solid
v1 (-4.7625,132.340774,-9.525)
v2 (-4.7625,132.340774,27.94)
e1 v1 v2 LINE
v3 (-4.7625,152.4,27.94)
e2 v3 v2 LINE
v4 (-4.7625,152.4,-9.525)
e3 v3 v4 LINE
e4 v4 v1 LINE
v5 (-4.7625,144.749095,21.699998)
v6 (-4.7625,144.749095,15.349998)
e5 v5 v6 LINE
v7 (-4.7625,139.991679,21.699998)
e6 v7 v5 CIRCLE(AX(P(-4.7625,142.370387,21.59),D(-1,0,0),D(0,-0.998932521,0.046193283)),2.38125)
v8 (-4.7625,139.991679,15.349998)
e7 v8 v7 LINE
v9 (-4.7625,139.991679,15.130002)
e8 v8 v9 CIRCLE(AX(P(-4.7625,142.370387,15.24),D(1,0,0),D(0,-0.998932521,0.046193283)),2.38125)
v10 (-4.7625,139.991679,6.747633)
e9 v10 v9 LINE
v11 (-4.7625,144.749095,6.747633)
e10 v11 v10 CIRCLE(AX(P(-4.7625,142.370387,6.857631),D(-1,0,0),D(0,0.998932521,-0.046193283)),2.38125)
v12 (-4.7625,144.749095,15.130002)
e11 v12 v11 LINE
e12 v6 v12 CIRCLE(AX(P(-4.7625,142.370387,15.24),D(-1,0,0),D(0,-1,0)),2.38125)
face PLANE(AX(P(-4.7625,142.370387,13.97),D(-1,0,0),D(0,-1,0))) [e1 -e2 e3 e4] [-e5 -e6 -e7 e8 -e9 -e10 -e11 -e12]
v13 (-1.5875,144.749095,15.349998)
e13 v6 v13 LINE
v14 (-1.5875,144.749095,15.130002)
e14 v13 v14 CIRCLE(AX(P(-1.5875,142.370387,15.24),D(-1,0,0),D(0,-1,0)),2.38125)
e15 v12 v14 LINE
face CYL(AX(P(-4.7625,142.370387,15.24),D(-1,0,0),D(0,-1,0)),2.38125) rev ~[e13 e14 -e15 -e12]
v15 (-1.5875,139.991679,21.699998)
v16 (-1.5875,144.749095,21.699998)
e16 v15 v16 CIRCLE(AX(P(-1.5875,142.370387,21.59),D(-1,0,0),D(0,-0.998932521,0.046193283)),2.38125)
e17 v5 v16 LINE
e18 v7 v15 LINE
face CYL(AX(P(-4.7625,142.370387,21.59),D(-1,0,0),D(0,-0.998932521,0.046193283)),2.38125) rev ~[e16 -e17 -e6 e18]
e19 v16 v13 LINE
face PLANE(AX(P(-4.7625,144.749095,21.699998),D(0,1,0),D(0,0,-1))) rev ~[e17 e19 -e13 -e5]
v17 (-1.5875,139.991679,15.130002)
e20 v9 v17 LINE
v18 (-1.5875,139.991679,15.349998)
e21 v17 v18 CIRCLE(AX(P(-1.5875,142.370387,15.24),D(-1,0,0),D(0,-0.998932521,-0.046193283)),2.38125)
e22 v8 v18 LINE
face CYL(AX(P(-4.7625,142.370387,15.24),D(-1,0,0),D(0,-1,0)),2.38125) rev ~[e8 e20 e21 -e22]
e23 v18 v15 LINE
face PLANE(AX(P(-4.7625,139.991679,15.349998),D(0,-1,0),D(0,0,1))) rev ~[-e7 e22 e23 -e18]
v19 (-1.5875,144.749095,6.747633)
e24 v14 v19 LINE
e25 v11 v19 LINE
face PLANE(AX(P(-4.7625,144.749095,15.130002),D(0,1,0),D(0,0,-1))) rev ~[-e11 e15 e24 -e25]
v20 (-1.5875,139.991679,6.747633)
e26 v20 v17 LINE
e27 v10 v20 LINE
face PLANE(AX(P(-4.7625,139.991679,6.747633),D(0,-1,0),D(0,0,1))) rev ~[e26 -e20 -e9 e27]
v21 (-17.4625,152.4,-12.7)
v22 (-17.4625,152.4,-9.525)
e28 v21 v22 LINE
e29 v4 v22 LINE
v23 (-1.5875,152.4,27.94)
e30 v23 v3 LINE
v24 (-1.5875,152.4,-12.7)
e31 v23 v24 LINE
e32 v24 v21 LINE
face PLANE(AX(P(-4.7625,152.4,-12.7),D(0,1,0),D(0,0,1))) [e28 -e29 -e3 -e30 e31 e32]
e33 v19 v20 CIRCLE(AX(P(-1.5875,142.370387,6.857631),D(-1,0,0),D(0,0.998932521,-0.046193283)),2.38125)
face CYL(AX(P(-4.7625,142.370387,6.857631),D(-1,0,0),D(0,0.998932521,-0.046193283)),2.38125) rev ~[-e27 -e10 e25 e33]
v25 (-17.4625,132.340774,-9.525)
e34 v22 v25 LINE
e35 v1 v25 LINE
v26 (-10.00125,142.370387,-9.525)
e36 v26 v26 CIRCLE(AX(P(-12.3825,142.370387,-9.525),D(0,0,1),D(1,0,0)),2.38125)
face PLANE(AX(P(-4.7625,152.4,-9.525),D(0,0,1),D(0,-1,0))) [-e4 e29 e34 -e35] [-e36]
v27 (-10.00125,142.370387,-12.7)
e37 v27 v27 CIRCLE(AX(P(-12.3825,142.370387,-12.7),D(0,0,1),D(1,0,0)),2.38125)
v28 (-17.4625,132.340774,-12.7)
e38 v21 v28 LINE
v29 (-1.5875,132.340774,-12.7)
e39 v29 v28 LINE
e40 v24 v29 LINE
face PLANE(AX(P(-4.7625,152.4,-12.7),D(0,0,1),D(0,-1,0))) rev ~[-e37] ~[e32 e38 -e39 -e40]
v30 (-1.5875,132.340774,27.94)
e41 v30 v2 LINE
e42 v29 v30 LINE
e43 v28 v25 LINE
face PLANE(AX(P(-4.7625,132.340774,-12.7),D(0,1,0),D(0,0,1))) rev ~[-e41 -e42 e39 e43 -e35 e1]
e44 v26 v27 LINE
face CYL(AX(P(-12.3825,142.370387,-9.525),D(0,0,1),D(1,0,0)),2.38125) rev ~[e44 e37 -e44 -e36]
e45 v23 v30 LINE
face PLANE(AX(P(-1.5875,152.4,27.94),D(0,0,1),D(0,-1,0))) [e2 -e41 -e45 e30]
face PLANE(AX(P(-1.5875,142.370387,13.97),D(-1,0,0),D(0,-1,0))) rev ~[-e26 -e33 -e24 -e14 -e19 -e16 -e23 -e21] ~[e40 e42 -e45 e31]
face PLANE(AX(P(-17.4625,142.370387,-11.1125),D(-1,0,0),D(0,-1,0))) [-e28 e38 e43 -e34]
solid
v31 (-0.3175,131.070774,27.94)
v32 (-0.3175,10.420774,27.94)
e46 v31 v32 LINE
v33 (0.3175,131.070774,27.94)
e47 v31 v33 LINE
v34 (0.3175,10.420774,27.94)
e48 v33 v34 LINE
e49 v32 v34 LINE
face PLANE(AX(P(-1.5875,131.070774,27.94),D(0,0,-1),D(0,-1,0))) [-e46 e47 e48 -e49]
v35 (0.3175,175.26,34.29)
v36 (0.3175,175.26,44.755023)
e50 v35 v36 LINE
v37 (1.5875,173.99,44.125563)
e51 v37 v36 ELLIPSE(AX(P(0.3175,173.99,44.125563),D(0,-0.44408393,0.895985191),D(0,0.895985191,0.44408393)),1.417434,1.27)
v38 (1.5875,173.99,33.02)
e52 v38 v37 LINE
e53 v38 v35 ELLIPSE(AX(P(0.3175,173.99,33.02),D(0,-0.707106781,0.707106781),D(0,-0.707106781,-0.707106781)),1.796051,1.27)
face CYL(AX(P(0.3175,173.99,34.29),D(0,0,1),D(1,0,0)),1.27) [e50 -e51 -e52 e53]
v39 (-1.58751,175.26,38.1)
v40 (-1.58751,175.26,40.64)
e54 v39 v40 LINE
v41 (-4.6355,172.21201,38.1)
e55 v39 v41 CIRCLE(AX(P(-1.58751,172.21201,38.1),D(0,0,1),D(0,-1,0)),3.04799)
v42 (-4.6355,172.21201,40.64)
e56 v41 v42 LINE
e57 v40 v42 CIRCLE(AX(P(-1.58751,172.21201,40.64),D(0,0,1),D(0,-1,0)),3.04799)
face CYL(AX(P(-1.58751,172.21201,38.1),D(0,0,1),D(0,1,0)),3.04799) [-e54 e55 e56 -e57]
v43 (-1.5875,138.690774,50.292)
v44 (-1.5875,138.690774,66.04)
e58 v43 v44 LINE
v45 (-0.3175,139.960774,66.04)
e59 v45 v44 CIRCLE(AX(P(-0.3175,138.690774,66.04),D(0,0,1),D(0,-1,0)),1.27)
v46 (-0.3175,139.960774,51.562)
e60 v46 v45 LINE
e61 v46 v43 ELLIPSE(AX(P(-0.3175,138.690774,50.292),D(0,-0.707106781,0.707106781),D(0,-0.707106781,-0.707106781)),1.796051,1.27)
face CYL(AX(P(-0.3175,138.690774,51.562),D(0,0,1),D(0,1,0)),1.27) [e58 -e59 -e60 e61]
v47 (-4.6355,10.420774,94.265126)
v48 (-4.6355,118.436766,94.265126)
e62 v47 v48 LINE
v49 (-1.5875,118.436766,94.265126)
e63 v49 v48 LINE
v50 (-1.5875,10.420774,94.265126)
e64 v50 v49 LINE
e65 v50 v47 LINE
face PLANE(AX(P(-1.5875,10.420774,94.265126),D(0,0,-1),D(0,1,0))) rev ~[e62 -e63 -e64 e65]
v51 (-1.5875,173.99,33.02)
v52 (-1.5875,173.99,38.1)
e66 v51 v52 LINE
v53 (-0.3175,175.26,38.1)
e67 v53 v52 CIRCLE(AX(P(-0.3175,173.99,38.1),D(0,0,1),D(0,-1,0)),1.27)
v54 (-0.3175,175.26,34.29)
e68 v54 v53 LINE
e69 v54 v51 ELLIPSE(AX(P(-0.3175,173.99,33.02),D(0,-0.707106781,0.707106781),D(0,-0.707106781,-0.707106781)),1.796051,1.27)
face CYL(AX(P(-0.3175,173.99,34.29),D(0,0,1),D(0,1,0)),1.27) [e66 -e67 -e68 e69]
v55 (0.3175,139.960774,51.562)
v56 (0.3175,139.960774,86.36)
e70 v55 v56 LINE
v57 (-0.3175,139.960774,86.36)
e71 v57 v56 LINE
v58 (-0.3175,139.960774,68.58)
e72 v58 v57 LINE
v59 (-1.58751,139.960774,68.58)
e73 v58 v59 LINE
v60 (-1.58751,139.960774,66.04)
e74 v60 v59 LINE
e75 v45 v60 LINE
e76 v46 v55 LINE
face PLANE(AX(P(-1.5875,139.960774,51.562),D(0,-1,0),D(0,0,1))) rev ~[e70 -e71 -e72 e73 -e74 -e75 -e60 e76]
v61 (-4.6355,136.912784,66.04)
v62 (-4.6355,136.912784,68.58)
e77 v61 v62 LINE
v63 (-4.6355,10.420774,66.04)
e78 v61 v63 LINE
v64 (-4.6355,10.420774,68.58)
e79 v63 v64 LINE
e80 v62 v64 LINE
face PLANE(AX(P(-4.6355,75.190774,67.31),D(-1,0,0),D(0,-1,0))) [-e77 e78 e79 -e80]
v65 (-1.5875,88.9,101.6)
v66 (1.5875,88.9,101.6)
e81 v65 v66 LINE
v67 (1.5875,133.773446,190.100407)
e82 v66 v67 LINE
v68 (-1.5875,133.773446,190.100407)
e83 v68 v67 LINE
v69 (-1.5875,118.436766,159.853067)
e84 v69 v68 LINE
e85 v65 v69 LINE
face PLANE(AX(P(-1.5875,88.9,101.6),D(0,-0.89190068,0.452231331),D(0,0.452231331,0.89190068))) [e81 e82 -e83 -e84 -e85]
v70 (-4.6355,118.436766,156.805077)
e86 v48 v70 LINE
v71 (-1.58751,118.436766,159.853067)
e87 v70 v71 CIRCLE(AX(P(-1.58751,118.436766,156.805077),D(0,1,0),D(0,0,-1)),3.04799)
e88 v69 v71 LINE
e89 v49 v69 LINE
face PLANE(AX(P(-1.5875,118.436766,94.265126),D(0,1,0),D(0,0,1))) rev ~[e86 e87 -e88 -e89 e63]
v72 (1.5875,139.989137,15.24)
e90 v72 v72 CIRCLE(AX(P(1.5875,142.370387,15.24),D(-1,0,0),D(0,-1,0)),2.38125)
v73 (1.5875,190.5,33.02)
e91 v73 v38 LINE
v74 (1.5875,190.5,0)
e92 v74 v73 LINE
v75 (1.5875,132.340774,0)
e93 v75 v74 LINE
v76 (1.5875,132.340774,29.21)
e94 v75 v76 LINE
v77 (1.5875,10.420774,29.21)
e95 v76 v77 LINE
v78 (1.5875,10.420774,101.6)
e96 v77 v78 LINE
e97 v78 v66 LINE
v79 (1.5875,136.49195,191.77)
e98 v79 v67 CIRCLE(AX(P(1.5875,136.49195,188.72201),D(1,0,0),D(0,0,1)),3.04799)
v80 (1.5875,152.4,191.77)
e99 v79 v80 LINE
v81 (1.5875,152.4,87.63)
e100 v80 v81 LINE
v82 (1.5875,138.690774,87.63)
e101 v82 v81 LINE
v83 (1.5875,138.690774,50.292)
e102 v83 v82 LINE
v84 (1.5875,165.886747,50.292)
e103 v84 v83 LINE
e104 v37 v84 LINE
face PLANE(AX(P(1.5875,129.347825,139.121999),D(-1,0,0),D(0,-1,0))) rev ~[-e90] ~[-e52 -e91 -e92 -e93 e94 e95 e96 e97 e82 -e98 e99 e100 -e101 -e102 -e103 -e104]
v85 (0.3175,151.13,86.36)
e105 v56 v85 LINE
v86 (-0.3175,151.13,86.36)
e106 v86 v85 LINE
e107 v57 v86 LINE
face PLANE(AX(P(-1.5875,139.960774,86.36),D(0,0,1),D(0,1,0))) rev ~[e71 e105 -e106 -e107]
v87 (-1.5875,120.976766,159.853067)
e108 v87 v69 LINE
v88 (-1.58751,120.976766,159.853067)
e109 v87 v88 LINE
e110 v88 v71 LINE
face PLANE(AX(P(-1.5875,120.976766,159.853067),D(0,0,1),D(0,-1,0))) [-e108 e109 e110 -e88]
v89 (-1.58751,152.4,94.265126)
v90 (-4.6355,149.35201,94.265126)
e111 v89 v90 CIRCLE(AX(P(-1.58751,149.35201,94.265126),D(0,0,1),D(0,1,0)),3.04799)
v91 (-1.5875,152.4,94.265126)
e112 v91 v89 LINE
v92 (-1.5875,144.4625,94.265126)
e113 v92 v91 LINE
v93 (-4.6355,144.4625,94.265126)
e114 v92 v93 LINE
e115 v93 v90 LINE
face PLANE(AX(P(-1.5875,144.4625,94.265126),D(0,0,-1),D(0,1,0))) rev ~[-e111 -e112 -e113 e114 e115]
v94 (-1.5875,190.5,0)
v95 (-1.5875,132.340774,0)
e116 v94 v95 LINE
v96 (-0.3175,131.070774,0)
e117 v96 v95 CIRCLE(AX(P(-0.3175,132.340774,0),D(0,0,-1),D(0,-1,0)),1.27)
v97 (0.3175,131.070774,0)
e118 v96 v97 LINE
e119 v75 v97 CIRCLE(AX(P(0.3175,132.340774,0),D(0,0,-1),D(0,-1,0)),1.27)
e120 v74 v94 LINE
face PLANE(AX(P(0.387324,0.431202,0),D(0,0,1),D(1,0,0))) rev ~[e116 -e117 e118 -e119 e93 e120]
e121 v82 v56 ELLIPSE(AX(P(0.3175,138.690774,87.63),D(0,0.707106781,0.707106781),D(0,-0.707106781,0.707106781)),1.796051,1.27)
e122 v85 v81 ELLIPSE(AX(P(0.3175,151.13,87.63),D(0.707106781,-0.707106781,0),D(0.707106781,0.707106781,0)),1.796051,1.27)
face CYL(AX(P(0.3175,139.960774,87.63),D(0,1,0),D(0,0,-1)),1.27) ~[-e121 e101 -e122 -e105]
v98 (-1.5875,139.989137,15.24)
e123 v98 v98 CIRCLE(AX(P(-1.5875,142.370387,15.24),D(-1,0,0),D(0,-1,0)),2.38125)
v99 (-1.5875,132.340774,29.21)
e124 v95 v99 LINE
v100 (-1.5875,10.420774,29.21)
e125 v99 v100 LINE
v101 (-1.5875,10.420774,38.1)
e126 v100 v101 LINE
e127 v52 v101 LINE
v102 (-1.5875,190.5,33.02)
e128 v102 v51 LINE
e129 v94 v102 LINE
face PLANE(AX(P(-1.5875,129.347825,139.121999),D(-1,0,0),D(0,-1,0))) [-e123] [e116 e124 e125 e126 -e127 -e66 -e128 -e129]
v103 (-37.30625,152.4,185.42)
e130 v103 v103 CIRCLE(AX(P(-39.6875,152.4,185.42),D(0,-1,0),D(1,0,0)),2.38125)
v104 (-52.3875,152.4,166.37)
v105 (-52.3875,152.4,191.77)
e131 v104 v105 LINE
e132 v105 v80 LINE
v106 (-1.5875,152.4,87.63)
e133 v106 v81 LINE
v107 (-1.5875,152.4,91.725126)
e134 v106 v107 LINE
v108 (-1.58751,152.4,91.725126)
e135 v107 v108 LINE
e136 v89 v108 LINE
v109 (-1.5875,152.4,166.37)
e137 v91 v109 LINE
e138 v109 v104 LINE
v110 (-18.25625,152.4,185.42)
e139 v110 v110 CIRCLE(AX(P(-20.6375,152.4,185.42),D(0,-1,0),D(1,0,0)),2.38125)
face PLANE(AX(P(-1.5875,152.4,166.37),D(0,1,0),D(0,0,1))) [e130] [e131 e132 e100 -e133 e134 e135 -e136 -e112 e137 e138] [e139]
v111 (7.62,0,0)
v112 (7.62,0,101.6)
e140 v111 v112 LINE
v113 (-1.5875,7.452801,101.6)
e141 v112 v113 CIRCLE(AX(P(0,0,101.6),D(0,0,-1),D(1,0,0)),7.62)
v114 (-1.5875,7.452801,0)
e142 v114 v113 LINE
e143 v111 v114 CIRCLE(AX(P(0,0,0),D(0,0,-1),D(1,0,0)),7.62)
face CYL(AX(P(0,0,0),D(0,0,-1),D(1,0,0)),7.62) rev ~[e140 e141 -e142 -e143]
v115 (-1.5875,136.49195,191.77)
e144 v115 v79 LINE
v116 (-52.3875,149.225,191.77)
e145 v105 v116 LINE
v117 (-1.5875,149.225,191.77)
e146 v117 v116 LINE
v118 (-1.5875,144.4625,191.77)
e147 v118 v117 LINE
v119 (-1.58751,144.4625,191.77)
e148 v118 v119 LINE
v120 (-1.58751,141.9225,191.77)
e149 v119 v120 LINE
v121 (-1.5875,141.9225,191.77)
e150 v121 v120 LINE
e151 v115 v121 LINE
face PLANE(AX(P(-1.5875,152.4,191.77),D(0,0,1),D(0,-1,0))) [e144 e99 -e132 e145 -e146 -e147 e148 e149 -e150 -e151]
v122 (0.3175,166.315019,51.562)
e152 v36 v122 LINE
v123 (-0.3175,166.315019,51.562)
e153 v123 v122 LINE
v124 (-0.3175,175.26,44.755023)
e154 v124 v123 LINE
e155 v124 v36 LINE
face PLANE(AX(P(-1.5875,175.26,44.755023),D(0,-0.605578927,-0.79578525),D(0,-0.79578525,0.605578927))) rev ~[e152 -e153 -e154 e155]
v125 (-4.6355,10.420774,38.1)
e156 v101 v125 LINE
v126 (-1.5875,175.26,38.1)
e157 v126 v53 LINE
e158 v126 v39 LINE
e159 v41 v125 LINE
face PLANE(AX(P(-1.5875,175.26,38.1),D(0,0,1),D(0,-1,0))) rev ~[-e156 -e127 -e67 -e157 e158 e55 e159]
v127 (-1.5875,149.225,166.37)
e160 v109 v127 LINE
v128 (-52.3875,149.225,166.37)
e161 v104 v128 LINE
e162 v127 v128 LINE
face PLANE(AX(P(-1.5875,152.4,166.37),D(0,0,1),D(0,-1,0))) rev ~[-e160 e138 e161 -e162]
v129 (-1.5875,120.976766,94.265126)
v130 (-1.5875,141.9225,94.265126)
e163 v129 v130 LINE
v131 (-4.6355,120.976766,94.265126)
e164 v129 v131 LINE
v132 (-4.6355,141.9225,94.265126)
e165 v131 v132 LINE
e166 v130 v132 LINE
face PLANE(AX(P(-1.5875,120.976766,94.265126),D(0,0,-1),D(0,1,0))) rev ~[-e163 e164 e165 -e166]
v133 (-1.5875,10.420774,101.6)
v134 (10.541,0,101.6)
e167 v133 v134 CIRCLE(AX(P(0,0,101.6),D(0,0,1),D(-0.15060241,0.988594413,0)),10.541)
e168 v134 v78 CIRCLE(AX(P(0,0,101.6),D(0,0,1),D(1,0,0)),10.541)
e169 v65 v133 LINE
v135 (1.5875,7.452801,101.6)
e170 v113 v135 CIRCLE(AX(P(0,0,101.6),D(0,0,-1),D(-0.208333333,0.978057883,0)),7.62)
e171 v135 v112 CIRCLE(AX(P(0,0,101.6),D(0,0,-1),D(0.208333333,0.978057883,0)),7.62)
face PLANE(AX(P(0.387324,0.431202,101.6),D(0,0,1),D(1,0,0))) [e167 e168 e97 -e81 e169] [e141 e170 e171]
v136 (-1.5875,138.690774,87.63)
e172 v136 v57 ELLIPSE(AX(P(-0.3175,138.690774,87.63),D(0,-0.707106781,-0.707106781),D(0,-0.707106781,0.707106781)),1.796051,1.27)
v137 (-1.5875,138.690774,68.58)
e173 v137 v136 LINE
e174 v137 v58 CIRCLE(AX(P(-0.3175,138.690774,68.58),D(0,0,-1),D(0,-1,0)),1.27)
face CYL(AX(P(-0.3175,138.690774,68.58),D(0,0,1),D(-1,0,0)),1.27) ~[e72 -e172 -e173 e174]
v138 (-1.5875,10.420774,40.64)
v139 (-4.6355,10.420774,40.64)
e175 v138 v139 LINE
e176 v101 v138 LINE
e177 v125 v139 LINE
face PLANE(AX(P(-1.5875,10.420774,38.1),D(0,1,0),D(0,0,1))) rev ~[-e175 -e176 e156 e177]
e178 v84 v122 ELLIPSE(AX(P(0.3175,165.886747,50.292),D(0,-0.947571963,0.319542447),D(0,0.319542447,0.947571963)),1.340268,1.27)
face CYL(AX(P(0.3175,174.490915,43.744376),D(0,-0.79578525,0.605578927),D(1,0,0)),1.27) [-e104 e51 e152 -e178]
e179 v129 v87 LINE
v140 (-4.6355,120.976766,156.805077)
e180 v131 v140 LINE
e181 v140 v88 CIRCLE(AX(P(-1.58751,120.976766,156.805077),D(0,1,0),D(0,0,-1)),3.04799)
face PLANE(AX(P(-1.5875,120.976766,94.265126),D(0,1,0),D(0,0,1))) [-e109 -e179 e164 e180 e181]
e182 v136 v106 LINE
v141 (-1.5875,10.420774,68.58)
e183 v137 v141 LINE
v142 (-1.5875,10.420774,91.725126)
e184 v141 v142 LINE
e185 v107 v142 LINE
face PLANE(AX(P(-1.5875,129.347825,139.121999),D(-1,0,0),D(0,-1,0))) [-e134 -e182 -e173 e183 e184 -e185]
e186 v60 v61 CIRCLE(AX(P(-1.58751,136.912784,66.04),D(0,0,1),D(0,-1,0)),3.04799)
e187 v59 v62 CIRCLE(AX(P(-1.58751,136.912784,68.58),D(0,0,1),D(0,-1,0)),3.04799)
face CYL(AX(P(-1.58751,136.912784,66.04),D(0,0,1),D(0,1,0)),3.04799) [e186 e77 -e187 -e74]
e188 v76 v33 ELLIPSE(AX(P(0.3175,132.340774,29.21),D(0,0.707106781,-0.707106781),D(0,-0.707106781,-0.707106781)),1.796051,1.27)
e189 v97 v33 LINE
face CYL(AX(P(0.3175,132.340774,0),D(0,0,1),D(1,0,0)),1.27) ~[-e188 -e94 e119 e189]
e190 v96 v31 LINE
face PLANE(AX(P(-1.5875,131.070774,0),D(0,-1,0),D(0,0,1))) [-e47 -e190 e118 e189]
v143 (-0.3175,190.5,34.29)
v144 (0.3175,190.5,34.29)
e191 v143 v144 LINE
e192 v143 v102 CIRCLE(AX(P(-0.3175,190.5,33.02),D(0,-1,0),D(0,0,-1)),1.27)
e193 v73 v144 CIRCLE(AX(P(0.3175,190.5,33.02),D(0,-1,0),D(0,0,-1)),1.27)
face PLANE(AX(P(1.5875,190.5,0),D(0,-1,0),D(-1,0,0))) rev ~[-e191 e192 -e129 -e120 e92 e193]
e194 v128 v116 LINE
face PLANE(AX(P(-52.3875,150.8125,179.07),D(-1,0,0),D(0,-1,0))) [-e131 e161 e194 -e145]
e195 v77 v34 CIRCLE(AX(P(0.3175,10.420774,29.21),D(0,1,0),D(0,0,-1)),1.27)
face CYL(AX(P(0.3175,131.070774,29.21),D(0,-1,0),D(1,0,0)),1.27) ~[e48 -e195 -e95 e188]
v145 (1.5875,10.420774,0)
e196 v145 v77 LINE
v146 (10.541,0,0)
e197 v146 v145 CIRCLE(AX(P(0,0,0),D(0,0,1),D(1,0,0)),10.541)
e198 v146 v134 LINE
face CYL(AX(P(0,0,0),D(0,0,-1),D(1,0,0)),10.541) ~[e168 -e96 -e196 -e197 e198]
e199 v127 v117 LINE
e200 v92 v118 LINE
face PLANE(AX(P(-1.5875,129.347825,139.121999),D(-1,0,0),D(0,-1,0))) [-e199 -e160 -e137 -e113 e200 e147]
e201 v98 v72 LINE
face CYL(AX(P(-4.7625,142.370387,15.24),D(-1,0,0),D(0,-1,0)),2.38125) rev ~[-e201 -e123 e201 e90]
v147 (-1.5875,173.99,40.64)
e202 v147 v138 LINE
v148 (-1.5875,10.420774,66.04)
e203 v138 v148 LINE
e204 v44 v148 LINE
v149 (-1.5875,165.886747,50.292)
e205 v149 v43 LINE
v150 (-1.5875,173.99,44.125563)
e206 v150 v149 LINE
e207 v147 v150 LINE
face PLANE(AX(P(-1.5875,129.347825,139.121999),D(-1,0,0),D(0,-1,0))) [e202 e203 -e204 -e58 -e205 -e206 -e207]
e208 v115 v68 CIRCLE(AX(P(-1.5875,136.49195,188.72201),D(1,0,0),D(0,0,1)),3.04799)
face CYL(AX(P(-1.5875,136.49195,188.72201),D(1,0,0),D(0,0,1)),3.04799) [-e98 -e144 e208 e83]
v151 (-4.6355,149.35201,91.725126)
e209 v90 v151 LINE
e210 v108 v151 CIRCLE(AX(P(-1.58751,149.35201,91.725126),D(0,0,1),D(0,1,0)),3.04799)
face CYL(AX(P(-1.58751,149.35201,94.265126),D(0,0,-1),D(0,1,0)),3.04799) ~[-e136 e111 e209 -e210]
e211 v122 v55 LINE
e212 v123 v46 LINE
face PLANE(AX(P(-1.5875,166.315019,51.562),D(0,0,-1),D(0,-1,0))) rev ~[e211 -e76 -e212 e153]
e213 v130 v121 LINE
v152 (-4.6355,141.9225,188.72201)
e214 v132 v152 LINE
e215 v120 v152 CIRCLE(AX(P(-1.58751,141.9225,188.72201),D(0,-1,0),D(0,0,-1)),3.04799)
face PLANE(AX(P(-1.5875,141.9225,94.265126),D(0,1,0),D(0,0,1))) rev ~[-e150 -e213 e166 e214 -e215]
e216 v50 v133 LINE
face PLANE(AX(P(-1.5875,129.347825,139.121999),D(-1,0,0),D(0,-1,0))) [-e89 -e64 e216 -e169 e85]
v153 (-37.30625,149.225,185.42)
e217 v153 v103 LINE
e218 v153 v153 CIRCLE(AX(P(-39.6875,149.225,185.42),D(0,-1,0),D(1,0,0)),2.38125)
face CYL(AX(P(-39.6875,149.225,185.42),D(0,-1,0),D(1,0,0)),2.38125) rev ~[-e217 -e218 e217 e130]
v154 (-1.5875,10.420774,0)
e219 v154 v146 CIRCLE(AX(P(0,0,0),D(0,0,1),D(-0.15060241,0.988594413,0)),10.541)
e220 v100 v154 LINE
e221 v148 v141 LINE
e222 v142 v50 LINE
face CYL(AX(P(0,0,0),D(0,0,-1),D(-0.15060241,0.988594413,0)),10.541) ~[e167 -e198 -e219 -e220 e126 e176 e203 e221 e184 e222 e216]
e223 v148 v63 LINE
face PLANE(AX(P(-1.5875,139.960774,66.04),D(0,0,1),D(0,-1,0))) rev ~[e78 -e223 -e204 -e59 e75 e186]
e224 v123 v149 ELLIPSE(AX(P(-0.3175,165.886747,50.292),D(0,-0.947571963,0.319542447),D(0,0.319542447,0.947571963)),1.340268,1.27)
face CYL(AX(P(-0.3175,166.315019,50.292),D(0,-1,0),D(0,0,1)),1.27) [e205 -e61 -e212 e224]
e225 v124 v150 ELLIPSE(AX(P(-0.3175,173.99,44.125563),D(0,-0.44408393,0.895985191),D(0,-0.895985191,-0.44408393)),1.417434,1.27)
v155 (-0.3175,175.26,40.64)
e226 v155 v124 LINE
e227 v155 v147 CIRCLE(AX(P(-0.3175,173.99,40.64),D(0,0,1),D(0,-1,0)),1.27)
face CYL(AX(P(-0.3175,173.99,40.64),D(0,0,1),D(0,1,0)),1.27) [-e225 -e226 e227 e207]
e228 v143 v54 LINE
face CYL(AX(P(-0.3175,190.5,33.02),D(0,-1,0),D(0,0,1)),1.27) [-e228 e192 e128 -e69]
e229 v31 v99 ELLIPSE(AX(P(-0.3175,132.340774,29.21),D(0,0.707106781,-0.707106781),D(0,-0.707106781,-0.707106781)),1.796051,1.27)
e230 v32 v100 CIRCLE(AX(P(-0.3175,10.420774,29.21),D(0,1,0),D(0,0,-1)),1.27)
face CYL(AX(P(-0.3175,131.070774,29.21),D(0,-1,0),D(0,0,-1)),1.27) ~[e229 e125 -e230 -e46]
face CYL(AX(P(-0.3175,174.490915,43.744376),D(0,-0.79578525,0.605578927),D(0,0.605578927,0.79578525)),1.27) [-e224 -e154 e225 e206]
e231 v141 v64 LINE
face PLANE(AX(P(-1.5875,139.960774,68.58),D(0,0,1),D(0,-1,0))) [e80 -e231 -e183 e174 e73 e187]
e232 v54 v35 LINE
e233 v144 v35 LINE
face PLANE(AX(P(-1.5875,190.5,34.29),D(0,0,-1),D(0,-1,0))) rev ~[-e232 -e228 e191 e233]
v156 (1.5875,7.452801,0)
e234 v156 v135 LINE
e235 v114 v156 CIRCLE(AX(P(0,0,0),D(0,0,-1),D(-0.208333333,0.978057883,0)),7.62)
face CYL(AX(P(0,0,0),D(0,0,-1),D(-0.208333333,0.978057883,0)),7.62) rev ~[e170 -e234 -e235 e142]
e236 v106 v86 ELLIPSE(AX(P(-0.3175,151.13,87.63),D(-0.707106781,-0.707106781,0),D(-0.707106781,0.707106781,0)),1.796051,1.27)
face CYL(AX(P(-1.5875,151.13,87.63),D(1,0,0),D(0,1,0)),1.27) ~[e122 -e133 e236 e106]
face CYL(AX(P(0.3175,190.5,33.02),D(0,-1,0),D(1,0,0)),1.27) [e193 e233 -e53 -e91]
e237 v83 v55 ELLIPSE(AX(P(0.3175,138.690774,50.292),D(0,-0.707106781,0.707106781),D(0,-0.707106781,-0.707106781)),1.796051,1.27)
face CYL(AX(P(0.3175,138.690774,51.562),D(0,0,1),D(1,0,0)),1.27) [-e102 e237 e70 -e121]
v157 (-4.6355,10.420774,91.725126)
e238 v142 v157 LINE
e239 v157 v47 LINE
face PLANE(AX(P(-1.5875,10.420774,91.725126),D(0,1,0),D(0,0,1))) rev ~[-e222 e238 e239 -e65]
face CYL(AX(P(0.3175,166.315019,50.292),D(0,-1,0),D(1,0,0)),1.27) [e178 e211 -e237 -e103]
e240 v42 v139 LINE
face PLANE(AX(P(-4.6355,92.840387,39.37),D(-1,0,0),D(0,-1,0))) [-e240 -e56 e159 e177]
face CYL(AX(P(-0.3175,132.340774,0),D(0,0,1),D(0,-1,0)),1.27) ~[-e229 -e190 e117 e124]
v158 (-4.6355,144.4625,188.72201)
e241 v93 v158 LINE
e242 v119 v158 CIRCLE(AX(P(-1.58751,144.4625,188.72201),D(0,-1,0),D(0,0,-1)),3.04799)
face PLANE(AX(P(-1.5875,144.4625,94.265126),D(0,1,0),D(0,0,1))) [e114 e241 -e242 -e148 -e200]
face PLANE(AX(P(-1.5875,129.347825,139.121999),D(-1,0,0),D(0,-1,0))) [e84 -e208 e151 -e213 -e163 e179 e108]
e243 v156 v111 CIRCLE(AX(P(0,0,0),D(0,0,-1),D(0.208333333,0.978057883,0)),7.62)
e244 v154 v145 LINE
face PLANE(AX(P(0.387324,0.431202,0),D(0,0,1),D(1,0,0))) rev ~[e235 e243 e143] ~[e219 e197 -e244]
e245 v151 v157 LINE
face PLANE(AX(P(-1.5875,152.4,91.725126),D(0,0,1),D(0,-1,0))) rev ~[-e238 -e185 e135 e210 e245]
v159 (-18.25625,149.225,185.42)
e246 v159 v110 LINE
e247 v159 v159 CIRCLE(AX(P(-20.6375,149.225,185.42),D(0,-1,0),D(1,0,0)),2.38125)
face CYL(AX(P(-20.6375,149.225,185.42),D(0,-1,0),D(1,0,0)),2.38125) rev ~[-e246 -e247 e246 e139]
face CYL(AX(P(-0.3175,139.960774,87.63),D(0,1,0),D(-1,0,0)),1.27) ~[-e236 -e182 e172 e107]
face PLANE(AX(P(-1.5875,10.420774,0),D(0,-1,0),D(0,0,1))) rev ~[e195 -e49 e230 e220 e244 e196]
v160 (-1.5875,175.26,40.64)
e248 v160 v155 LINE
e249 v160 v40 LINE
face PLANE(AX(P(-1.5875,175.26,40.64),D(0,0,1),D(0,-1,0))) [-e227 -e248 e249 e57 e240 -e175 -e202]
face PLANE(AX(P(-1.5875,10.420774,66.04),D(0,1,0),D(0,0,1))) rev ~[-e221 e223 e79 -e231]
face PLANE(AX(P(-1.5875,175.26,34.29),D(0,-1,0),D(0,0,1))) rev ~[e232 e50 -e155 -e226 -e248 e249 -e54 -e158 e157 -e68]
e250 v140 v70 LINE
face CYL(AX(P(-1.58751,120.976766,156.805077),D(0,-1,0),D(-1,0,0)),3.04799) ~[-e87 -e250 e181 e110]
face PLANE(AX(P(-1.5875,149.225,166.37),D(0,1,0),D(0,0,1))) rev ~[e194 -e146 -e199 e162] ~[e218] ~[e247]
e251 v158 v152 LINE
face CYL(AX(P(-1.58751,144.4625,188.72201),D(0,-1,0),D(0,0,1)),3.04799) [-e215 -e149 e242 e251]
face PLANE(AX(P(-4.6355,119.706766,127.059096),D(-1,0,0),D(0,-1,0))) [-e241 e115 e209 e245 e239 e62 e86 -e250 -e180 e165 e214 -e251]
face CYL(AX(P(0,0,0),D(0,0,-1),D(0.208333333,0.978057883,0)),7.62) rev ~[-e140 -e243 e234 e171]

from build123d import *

# Parameters (mm, degrees)
F1_DEPTH  = 101.6
F2_W      = 120.65
F2_H      = 27.94
F3_DEPTH  = 3.175
F4_W      = 38.1
F4_H      = 15.24
F5_DEPTH  = 3.175
F7_DEPTH  = 3.175
F8_W      = 3.175
F8_H      = 25.4
F9_DEPTH  = 50.8
F10_R     = 2.38125
F11_DEPTH = 7.62
F12_W     = 2.54
F12_H     = 65.5879406387
F12_H_2   = 97.5048740911
F12_W_2   = 129.54
F12_H_3   = 2.54
F12_W_3   = 164.8392262883
F13_DEPTH = 3.048
F14_R     = 3.04799
F15_R     = 1.27
F16_W     = 20.0592262883
F16_H     = 27.94
F16_H_2   = 12.7
F17_DEPTH = 3.175
F18_R     = 2.38125
F19_DEPTH = 25.4
F21_DEPTH = 3.175
F22_W     = 20.0592262883
F22_H     = 3.175
F23_DEPTH = 12.7
F24_R     = 2.38125
F25_DEPTH = 25.4


# Not quite as in the source:
# - a fillet or chamfer is up to 0.001 mm smaller than in the source, because OpenCascade refuses the exact size


with BuildPart() as f1:
    # F0 (on Top) → F1 (new body)
    with BuildSketch(Plane.XY):
        with BuildLine():
            ThreePointArc((1.5875, 7.4528010674), (5.9228856987, 4.7941448664), (7.62, 0))
            ThreePointArc((7.62, 0), (-4.7941448664, -5.9228856987), (-1.5875, 7.4528010674))
            Line((-1.5875, 7.4528010674), (-1.5875, 10.4207737117))
            ThreePointArc((-1.5875, 10.4207737117), (-6.8694557099, -7.9952022645), (10.541, 0))
            ThreePointArc((10.541, 0), (7.9952022645, 6.8694557099), (1.5875, 10.4207737117))
            Line((1.5875, 10.4207737117), (1.5875, 7.4528010674))
        make_face()
        with BuildLine():
            ThreePointArc((-1.5875, 7.4528010674), (0, 7.62), (1.5875, 7.4528010674))
            Line((1.5875, 7.4528010674), (1.5875, 10.4207737117))
            ThreePointArc((1.5875, 10.4207737117), (0, 10.541), (-1.5875, 10.4207737117))
            Line((-1.5875, 10.4207737117), (-1.5875, 7.4528010674))
        make_face()
        with BuildLine():
            ThreePointArc((-1.5875, 10.4207737117), (0, 10.541), (1.5875, 10.4207737117))
            Line((1.5875, 10.4207737117), (1.5875, 190.5))
            Line((1.5875, 190.5), (-1.5875, 190.5))
            Line((-1.5875, 190.5), (-1.5875, 10.4207737117))
        make_face()
    extrude(amount=F1_DEPTH)

    # F2 (on face) → F3 (cut, through all)
    with BuildSketch(Plane(origin=(-1.5875, 0, 0), x_dir=(0, -1, 0), z_dir=(-1, 0, 0))):
        with Locations((-70.7457737117, 13.97)):
            Rectangle(F2_W, F2_H)
    extrude(amount=-F3_DEPTH, mode=Mode.SUBTRACT)

    # F4 (on face) → F5 (cut, through all)
    with BuildSketch(Plane(origin=(-1.5875, 0, 0), x_dir=(0, -1, 0), z_dir=(-1, 0, 0))):
        Polygon((-152.4, 86.36), (-190.5, 86.36), (-190.5, 51.562), (-175.26, 51.562), (-166.3150191307, 51.562), (-139.9607737117, 51.562), (-139.9607737117, 86.36), align=None)
        with Locations((-171.45, 93.98)):
            Rectangle(F4_W, F4_H)
        Polygon((-175.26, 51.562), (-190.5, 51.562), (-190.5, 34.29), (-175.26, 34.29), (-175.26, 44.7550229728), align=None)
        Polygon((-166.3150191307, 51.562), (-175.26, 51.562), (-175.26, 44.7550229728), align=None)
    extrude(amount=-F5_DEPTH, mode=Mode.SUBTRACT)

    # F6 (on face) → F7 (join, through all)
    with BuildSketch(Plane(origin=(-1.5875, 0, 0), x_dir=(0, -1, 0), z_dir=(-1, 0, 0))):
        Polygon((-152.4, 191.77), (-152.4, 101.6), (-88.9, 101.6), (-134.62, 191.77), align=None)
    extrude(amount=-F7_DEPTH)

    # F8 (on face) → F9 (join)
    with BuildSketch(Plane(origin=(-1.5875, 0, 0), x_dir=(0, -1, 0), z_dir=(-1, 0, 0))):
        with Locations((-150.8125, 179.07)):
            Rectangle(F8_W, F8_H)
    extrude(amount=F9_DEPTH)

    # F10 (on face) + F9_face1 (on face) → F11 (cut)
    with BuildSketch(Plane.XZ.offset(-149.225)):
        with Locations((-39.6875, 185.42)):
            Circle(F10_R)
        with Locations((-20.6375, 185.42)):
            Circle(F10_R)
    with BuildSketch(Plane(origin=(-21.429280397, 152.4, 170.8307568238), x_dir=(-1, 0, 0), z_dir=(0, 1, 0))):
        Polygon((-23.016780397, -84.4707568238), (-19.841780397, -84.4707568238), (-19.841780397, -4.4607568238), (30.958219603, -4.4607568238), (30.958219603, 20.9392431762), (-23.016780397, 20.9392431762), align=None)
    extrude(amount=-F11_DEPTH, dir=(0, -1, 0), mode=Mode.SUBTRACT)

    # F12 (on face) → F13 (join)
    with BuildSketch(Plane(origin=(-1.5875, 0, 0), x_dir=(0, -1, 0), z_dir=(-1, 0, 0))):
        with Locations((-119.7067661368, 127.0590962282)):
            Rectangle(F12_W, F12_H)
        with Locations((-143.1925, 143.0175629544)):
            Rectangle(F12_W, F12_H_2)
        Polygon((-152.4, 91.7251259089), (-10.4207737117, 91.7251259089), (-10.4207737117, 94.2651259089), (-118.4367661368, 94.2651259089), (-120.9767661368, 94.2651259089), (-141.9225, 94.2651259089), (-144.4625, 94.2651259089), (-152.4, 94.2651259089), align=None)
        with Locations((-75.1907737117, 67.31)):
            Rectangle(F12_W_2, F12_H_3)
        with Locations((-92.8403868558, 39.37)):
            Rectangle(F12_W_3, F12_H_3)
    extrude(amount=F13_DEPTH)

    # F14 (radius 3.048 in the source; OpenCascade refuses exactly that, so slightly less here)
    f14_edges = [f1.edges().sort_by_distance(p)[0] for p in [
        (0, 134.62, 191.77),
        (-4.6355, 143.1925, 191.77),
        (-4.6355, 152.4, 92.995126),
        (-4.6355, 139.960774, 67.31),
        (-4.6355, 119.706766, 159.853067),
        (-4.6355, 175.26, 39.37),
    ]]
    fillet(f14_edges, radius=F14_R)

    # F15
    f15_edges = [f1.edges().sort_by_distance(p)[0] for p in [
        (-1.5875, 170.78751, 48.158511),
        (-1.5875, 153.137896, 51.562),
        (-1.5875, 182.88, 34.29),
        (-1.5875, 175.26, 36.195),
        (-1.5875, 175.26, 42.697511),
        (1.5875, 182.88, 34.29),
        (1.5875, 175.26, 39.522511),
        (1.5875, 170.78751, 48.158511),
        (1.5875, 153.137896, 51.562),
        (-1.5875, 139.960774, 58.801),
        (-1.5875, 139.960774, 77.47),
        (1.5875, 139.960774, 68.961),
        (-1.5875, 146.180387, 86.36),
        (1.5875, 146.180387, 86.36),
        (0, 152.4, 86.36),
        (1.5875, 70.745774, 27.94),
        (-1.5875, 70.745774, 27.94),
        (1.5875, 131.070774, 13.97),
        (-1.5875, 131.070774, 13.97),
    ]]
    fillet(f15_edges, radius=F15_R)


with BuildPart() as f17:
    # F16 (on face) → F17 (new body)
    with BuildSketch(Plane(origin=(-1.5875, 0, 0), x_dir=(0, -1, 0), z_dir=(-1, 0, 0))):
        with Locations((-142.3703868558, 13.97)):
            Rectangle(F16_W, F16_H)
        with Locations((-142.3703868558, -6.35)):
            Rectangle(F16_W, F16_H_2)
    extrude(amount=F17_DEPTH)


with BuildPart() as f19_tool:
    # F18 (on face) → F19 (new body)
    with BuildSketch(Plane(origin=(-4.7625, 0, 0), x_dir=(0, -1, 0), z_dir=(-1, 0, 0))):
        with Locations((-142.3703868558, 15.24)):
            Circle(F18_R)
    extrude(amount=-F19_DEPTH)


with BuildPart() as f1_1:
    add(f1.part)

    # F19: cut by f19_tool
    add(f19_tool.part, mode=Mode.SUBTRACT)


with BuildPart() as f17_1:
    add(f17.part)

    # F19: cut by f19_tool
    add(f19_tool.part, mode=Mode.SUBTRACT)

    # F20 (on face) → F21 (cut, through all)
    with BuildSketch(Plane(origin=(-4.7625, 0, 0), x_dir=(0, -1, 0), z_dir=(-1, 0, 0))):
        with BuildLine():
            Line((-144.7490949204, 21.6999977557), (-139.9916787913, 21.6999977557))
            ThreePointArc((-139.9916787913, 21.6999977557), (-142.3703868558, 23.97125), (-144.7490949204, 21.6999977557))
        make_face()
        with BuildLine():
            Line((-139.9916787913, 21.4800022443), (-139.9916787913, 21.6999977557))
            Line((-139.9916787913, 21.6999977557), (-144.7490949204, 21.6999977557))
            Line((-144.7490949204, 21.6999977557), (-144.7490949204, 21.4800022443))
            ThreePointArc((-144.7490949204, 21.4800022443), (-142.3703868558, 19.20875), (-139.9916787913, 21.4800022443))
        make_face()
        with BuildLine():
            Line((-139.9916787913, 15.3499977557), (-139.9916787913, 21.4800022443))
            ThreePointArc((-139.9916787913, 21.4800022443), (-142.3703868558, 19.20875), (-144.7490949204, 21.4800022443))
            Line((-144.7490949204, 21.4800022443), (-144.7490949204, 15.3499977557))
            ThreePointArc((-144.7490949204, 15.3499977557), (-142.3703868558, 17.62125), (-139.9916787913, 15.3499977557))
        make_face()
        with BuildLine():
            Line((-139.9916787913, 6.9676285562), (-139.9916787913, 15.1300022443))
            ThreePointArc((-139.9916787913, 15.1300022443), (-142.3703868558, 12.85875), (-144.7490949204, 15.1300022443))
            Line((-144.7490949204, 15.1300022443), (-144.7490949204, 6.9676285562))
            ThreePointArc((-144.7490949204, 6.9676285562), (-142.3703868558, 9.2388808006), (-139.9916787913, 6.9676285562))
        make_face()
        with BuildLine():
            Line((-139.9916787913, 6.7476330449), (-139.9916787913, 6.9676285562))
            ThreePointArc((-139.9916787913, 6.9676285562), (-142.3703868558, 9.2388808006), (-144.7490949204, 6.9676285562))
            Line((-144.7490949204, 6.9676285562), (-144.7490949204, 6.7476330449))
            ThreePointArc((-144.7490949204, 6.7476330449), (-142.3703868558, 4.4763808006), (-139.9916787913, 6.7476330449))
        make_face()
    extrude(amount=-F21_DEPTH, mode=Mode.SUBTRACT)

    # F22 (on face) → F23 (join)
    with BuildSketch(Plane(origin=(-4.7625, 0, 0), x_dir=(0, -1, 0), z_dir=(-1, 0, 0))):
        with Locations((-142.3703868558, -11.1125)):
            Rectangle(F22_W, F22_H)
    extrude(amount=F23_DEPTH)

    # F24 (on face) → F25 (cut)
    with BuildSketch(Plane.XY.offset(-9.525)):
        with Locations((-12.3825, 142.3703868558)):
            Circle(F24_R)
    extrude(amount=-F25_DEPTH, mode=Mode.SUBTRACT)


solid = Compound([f1_1.part, f17_1.part])
